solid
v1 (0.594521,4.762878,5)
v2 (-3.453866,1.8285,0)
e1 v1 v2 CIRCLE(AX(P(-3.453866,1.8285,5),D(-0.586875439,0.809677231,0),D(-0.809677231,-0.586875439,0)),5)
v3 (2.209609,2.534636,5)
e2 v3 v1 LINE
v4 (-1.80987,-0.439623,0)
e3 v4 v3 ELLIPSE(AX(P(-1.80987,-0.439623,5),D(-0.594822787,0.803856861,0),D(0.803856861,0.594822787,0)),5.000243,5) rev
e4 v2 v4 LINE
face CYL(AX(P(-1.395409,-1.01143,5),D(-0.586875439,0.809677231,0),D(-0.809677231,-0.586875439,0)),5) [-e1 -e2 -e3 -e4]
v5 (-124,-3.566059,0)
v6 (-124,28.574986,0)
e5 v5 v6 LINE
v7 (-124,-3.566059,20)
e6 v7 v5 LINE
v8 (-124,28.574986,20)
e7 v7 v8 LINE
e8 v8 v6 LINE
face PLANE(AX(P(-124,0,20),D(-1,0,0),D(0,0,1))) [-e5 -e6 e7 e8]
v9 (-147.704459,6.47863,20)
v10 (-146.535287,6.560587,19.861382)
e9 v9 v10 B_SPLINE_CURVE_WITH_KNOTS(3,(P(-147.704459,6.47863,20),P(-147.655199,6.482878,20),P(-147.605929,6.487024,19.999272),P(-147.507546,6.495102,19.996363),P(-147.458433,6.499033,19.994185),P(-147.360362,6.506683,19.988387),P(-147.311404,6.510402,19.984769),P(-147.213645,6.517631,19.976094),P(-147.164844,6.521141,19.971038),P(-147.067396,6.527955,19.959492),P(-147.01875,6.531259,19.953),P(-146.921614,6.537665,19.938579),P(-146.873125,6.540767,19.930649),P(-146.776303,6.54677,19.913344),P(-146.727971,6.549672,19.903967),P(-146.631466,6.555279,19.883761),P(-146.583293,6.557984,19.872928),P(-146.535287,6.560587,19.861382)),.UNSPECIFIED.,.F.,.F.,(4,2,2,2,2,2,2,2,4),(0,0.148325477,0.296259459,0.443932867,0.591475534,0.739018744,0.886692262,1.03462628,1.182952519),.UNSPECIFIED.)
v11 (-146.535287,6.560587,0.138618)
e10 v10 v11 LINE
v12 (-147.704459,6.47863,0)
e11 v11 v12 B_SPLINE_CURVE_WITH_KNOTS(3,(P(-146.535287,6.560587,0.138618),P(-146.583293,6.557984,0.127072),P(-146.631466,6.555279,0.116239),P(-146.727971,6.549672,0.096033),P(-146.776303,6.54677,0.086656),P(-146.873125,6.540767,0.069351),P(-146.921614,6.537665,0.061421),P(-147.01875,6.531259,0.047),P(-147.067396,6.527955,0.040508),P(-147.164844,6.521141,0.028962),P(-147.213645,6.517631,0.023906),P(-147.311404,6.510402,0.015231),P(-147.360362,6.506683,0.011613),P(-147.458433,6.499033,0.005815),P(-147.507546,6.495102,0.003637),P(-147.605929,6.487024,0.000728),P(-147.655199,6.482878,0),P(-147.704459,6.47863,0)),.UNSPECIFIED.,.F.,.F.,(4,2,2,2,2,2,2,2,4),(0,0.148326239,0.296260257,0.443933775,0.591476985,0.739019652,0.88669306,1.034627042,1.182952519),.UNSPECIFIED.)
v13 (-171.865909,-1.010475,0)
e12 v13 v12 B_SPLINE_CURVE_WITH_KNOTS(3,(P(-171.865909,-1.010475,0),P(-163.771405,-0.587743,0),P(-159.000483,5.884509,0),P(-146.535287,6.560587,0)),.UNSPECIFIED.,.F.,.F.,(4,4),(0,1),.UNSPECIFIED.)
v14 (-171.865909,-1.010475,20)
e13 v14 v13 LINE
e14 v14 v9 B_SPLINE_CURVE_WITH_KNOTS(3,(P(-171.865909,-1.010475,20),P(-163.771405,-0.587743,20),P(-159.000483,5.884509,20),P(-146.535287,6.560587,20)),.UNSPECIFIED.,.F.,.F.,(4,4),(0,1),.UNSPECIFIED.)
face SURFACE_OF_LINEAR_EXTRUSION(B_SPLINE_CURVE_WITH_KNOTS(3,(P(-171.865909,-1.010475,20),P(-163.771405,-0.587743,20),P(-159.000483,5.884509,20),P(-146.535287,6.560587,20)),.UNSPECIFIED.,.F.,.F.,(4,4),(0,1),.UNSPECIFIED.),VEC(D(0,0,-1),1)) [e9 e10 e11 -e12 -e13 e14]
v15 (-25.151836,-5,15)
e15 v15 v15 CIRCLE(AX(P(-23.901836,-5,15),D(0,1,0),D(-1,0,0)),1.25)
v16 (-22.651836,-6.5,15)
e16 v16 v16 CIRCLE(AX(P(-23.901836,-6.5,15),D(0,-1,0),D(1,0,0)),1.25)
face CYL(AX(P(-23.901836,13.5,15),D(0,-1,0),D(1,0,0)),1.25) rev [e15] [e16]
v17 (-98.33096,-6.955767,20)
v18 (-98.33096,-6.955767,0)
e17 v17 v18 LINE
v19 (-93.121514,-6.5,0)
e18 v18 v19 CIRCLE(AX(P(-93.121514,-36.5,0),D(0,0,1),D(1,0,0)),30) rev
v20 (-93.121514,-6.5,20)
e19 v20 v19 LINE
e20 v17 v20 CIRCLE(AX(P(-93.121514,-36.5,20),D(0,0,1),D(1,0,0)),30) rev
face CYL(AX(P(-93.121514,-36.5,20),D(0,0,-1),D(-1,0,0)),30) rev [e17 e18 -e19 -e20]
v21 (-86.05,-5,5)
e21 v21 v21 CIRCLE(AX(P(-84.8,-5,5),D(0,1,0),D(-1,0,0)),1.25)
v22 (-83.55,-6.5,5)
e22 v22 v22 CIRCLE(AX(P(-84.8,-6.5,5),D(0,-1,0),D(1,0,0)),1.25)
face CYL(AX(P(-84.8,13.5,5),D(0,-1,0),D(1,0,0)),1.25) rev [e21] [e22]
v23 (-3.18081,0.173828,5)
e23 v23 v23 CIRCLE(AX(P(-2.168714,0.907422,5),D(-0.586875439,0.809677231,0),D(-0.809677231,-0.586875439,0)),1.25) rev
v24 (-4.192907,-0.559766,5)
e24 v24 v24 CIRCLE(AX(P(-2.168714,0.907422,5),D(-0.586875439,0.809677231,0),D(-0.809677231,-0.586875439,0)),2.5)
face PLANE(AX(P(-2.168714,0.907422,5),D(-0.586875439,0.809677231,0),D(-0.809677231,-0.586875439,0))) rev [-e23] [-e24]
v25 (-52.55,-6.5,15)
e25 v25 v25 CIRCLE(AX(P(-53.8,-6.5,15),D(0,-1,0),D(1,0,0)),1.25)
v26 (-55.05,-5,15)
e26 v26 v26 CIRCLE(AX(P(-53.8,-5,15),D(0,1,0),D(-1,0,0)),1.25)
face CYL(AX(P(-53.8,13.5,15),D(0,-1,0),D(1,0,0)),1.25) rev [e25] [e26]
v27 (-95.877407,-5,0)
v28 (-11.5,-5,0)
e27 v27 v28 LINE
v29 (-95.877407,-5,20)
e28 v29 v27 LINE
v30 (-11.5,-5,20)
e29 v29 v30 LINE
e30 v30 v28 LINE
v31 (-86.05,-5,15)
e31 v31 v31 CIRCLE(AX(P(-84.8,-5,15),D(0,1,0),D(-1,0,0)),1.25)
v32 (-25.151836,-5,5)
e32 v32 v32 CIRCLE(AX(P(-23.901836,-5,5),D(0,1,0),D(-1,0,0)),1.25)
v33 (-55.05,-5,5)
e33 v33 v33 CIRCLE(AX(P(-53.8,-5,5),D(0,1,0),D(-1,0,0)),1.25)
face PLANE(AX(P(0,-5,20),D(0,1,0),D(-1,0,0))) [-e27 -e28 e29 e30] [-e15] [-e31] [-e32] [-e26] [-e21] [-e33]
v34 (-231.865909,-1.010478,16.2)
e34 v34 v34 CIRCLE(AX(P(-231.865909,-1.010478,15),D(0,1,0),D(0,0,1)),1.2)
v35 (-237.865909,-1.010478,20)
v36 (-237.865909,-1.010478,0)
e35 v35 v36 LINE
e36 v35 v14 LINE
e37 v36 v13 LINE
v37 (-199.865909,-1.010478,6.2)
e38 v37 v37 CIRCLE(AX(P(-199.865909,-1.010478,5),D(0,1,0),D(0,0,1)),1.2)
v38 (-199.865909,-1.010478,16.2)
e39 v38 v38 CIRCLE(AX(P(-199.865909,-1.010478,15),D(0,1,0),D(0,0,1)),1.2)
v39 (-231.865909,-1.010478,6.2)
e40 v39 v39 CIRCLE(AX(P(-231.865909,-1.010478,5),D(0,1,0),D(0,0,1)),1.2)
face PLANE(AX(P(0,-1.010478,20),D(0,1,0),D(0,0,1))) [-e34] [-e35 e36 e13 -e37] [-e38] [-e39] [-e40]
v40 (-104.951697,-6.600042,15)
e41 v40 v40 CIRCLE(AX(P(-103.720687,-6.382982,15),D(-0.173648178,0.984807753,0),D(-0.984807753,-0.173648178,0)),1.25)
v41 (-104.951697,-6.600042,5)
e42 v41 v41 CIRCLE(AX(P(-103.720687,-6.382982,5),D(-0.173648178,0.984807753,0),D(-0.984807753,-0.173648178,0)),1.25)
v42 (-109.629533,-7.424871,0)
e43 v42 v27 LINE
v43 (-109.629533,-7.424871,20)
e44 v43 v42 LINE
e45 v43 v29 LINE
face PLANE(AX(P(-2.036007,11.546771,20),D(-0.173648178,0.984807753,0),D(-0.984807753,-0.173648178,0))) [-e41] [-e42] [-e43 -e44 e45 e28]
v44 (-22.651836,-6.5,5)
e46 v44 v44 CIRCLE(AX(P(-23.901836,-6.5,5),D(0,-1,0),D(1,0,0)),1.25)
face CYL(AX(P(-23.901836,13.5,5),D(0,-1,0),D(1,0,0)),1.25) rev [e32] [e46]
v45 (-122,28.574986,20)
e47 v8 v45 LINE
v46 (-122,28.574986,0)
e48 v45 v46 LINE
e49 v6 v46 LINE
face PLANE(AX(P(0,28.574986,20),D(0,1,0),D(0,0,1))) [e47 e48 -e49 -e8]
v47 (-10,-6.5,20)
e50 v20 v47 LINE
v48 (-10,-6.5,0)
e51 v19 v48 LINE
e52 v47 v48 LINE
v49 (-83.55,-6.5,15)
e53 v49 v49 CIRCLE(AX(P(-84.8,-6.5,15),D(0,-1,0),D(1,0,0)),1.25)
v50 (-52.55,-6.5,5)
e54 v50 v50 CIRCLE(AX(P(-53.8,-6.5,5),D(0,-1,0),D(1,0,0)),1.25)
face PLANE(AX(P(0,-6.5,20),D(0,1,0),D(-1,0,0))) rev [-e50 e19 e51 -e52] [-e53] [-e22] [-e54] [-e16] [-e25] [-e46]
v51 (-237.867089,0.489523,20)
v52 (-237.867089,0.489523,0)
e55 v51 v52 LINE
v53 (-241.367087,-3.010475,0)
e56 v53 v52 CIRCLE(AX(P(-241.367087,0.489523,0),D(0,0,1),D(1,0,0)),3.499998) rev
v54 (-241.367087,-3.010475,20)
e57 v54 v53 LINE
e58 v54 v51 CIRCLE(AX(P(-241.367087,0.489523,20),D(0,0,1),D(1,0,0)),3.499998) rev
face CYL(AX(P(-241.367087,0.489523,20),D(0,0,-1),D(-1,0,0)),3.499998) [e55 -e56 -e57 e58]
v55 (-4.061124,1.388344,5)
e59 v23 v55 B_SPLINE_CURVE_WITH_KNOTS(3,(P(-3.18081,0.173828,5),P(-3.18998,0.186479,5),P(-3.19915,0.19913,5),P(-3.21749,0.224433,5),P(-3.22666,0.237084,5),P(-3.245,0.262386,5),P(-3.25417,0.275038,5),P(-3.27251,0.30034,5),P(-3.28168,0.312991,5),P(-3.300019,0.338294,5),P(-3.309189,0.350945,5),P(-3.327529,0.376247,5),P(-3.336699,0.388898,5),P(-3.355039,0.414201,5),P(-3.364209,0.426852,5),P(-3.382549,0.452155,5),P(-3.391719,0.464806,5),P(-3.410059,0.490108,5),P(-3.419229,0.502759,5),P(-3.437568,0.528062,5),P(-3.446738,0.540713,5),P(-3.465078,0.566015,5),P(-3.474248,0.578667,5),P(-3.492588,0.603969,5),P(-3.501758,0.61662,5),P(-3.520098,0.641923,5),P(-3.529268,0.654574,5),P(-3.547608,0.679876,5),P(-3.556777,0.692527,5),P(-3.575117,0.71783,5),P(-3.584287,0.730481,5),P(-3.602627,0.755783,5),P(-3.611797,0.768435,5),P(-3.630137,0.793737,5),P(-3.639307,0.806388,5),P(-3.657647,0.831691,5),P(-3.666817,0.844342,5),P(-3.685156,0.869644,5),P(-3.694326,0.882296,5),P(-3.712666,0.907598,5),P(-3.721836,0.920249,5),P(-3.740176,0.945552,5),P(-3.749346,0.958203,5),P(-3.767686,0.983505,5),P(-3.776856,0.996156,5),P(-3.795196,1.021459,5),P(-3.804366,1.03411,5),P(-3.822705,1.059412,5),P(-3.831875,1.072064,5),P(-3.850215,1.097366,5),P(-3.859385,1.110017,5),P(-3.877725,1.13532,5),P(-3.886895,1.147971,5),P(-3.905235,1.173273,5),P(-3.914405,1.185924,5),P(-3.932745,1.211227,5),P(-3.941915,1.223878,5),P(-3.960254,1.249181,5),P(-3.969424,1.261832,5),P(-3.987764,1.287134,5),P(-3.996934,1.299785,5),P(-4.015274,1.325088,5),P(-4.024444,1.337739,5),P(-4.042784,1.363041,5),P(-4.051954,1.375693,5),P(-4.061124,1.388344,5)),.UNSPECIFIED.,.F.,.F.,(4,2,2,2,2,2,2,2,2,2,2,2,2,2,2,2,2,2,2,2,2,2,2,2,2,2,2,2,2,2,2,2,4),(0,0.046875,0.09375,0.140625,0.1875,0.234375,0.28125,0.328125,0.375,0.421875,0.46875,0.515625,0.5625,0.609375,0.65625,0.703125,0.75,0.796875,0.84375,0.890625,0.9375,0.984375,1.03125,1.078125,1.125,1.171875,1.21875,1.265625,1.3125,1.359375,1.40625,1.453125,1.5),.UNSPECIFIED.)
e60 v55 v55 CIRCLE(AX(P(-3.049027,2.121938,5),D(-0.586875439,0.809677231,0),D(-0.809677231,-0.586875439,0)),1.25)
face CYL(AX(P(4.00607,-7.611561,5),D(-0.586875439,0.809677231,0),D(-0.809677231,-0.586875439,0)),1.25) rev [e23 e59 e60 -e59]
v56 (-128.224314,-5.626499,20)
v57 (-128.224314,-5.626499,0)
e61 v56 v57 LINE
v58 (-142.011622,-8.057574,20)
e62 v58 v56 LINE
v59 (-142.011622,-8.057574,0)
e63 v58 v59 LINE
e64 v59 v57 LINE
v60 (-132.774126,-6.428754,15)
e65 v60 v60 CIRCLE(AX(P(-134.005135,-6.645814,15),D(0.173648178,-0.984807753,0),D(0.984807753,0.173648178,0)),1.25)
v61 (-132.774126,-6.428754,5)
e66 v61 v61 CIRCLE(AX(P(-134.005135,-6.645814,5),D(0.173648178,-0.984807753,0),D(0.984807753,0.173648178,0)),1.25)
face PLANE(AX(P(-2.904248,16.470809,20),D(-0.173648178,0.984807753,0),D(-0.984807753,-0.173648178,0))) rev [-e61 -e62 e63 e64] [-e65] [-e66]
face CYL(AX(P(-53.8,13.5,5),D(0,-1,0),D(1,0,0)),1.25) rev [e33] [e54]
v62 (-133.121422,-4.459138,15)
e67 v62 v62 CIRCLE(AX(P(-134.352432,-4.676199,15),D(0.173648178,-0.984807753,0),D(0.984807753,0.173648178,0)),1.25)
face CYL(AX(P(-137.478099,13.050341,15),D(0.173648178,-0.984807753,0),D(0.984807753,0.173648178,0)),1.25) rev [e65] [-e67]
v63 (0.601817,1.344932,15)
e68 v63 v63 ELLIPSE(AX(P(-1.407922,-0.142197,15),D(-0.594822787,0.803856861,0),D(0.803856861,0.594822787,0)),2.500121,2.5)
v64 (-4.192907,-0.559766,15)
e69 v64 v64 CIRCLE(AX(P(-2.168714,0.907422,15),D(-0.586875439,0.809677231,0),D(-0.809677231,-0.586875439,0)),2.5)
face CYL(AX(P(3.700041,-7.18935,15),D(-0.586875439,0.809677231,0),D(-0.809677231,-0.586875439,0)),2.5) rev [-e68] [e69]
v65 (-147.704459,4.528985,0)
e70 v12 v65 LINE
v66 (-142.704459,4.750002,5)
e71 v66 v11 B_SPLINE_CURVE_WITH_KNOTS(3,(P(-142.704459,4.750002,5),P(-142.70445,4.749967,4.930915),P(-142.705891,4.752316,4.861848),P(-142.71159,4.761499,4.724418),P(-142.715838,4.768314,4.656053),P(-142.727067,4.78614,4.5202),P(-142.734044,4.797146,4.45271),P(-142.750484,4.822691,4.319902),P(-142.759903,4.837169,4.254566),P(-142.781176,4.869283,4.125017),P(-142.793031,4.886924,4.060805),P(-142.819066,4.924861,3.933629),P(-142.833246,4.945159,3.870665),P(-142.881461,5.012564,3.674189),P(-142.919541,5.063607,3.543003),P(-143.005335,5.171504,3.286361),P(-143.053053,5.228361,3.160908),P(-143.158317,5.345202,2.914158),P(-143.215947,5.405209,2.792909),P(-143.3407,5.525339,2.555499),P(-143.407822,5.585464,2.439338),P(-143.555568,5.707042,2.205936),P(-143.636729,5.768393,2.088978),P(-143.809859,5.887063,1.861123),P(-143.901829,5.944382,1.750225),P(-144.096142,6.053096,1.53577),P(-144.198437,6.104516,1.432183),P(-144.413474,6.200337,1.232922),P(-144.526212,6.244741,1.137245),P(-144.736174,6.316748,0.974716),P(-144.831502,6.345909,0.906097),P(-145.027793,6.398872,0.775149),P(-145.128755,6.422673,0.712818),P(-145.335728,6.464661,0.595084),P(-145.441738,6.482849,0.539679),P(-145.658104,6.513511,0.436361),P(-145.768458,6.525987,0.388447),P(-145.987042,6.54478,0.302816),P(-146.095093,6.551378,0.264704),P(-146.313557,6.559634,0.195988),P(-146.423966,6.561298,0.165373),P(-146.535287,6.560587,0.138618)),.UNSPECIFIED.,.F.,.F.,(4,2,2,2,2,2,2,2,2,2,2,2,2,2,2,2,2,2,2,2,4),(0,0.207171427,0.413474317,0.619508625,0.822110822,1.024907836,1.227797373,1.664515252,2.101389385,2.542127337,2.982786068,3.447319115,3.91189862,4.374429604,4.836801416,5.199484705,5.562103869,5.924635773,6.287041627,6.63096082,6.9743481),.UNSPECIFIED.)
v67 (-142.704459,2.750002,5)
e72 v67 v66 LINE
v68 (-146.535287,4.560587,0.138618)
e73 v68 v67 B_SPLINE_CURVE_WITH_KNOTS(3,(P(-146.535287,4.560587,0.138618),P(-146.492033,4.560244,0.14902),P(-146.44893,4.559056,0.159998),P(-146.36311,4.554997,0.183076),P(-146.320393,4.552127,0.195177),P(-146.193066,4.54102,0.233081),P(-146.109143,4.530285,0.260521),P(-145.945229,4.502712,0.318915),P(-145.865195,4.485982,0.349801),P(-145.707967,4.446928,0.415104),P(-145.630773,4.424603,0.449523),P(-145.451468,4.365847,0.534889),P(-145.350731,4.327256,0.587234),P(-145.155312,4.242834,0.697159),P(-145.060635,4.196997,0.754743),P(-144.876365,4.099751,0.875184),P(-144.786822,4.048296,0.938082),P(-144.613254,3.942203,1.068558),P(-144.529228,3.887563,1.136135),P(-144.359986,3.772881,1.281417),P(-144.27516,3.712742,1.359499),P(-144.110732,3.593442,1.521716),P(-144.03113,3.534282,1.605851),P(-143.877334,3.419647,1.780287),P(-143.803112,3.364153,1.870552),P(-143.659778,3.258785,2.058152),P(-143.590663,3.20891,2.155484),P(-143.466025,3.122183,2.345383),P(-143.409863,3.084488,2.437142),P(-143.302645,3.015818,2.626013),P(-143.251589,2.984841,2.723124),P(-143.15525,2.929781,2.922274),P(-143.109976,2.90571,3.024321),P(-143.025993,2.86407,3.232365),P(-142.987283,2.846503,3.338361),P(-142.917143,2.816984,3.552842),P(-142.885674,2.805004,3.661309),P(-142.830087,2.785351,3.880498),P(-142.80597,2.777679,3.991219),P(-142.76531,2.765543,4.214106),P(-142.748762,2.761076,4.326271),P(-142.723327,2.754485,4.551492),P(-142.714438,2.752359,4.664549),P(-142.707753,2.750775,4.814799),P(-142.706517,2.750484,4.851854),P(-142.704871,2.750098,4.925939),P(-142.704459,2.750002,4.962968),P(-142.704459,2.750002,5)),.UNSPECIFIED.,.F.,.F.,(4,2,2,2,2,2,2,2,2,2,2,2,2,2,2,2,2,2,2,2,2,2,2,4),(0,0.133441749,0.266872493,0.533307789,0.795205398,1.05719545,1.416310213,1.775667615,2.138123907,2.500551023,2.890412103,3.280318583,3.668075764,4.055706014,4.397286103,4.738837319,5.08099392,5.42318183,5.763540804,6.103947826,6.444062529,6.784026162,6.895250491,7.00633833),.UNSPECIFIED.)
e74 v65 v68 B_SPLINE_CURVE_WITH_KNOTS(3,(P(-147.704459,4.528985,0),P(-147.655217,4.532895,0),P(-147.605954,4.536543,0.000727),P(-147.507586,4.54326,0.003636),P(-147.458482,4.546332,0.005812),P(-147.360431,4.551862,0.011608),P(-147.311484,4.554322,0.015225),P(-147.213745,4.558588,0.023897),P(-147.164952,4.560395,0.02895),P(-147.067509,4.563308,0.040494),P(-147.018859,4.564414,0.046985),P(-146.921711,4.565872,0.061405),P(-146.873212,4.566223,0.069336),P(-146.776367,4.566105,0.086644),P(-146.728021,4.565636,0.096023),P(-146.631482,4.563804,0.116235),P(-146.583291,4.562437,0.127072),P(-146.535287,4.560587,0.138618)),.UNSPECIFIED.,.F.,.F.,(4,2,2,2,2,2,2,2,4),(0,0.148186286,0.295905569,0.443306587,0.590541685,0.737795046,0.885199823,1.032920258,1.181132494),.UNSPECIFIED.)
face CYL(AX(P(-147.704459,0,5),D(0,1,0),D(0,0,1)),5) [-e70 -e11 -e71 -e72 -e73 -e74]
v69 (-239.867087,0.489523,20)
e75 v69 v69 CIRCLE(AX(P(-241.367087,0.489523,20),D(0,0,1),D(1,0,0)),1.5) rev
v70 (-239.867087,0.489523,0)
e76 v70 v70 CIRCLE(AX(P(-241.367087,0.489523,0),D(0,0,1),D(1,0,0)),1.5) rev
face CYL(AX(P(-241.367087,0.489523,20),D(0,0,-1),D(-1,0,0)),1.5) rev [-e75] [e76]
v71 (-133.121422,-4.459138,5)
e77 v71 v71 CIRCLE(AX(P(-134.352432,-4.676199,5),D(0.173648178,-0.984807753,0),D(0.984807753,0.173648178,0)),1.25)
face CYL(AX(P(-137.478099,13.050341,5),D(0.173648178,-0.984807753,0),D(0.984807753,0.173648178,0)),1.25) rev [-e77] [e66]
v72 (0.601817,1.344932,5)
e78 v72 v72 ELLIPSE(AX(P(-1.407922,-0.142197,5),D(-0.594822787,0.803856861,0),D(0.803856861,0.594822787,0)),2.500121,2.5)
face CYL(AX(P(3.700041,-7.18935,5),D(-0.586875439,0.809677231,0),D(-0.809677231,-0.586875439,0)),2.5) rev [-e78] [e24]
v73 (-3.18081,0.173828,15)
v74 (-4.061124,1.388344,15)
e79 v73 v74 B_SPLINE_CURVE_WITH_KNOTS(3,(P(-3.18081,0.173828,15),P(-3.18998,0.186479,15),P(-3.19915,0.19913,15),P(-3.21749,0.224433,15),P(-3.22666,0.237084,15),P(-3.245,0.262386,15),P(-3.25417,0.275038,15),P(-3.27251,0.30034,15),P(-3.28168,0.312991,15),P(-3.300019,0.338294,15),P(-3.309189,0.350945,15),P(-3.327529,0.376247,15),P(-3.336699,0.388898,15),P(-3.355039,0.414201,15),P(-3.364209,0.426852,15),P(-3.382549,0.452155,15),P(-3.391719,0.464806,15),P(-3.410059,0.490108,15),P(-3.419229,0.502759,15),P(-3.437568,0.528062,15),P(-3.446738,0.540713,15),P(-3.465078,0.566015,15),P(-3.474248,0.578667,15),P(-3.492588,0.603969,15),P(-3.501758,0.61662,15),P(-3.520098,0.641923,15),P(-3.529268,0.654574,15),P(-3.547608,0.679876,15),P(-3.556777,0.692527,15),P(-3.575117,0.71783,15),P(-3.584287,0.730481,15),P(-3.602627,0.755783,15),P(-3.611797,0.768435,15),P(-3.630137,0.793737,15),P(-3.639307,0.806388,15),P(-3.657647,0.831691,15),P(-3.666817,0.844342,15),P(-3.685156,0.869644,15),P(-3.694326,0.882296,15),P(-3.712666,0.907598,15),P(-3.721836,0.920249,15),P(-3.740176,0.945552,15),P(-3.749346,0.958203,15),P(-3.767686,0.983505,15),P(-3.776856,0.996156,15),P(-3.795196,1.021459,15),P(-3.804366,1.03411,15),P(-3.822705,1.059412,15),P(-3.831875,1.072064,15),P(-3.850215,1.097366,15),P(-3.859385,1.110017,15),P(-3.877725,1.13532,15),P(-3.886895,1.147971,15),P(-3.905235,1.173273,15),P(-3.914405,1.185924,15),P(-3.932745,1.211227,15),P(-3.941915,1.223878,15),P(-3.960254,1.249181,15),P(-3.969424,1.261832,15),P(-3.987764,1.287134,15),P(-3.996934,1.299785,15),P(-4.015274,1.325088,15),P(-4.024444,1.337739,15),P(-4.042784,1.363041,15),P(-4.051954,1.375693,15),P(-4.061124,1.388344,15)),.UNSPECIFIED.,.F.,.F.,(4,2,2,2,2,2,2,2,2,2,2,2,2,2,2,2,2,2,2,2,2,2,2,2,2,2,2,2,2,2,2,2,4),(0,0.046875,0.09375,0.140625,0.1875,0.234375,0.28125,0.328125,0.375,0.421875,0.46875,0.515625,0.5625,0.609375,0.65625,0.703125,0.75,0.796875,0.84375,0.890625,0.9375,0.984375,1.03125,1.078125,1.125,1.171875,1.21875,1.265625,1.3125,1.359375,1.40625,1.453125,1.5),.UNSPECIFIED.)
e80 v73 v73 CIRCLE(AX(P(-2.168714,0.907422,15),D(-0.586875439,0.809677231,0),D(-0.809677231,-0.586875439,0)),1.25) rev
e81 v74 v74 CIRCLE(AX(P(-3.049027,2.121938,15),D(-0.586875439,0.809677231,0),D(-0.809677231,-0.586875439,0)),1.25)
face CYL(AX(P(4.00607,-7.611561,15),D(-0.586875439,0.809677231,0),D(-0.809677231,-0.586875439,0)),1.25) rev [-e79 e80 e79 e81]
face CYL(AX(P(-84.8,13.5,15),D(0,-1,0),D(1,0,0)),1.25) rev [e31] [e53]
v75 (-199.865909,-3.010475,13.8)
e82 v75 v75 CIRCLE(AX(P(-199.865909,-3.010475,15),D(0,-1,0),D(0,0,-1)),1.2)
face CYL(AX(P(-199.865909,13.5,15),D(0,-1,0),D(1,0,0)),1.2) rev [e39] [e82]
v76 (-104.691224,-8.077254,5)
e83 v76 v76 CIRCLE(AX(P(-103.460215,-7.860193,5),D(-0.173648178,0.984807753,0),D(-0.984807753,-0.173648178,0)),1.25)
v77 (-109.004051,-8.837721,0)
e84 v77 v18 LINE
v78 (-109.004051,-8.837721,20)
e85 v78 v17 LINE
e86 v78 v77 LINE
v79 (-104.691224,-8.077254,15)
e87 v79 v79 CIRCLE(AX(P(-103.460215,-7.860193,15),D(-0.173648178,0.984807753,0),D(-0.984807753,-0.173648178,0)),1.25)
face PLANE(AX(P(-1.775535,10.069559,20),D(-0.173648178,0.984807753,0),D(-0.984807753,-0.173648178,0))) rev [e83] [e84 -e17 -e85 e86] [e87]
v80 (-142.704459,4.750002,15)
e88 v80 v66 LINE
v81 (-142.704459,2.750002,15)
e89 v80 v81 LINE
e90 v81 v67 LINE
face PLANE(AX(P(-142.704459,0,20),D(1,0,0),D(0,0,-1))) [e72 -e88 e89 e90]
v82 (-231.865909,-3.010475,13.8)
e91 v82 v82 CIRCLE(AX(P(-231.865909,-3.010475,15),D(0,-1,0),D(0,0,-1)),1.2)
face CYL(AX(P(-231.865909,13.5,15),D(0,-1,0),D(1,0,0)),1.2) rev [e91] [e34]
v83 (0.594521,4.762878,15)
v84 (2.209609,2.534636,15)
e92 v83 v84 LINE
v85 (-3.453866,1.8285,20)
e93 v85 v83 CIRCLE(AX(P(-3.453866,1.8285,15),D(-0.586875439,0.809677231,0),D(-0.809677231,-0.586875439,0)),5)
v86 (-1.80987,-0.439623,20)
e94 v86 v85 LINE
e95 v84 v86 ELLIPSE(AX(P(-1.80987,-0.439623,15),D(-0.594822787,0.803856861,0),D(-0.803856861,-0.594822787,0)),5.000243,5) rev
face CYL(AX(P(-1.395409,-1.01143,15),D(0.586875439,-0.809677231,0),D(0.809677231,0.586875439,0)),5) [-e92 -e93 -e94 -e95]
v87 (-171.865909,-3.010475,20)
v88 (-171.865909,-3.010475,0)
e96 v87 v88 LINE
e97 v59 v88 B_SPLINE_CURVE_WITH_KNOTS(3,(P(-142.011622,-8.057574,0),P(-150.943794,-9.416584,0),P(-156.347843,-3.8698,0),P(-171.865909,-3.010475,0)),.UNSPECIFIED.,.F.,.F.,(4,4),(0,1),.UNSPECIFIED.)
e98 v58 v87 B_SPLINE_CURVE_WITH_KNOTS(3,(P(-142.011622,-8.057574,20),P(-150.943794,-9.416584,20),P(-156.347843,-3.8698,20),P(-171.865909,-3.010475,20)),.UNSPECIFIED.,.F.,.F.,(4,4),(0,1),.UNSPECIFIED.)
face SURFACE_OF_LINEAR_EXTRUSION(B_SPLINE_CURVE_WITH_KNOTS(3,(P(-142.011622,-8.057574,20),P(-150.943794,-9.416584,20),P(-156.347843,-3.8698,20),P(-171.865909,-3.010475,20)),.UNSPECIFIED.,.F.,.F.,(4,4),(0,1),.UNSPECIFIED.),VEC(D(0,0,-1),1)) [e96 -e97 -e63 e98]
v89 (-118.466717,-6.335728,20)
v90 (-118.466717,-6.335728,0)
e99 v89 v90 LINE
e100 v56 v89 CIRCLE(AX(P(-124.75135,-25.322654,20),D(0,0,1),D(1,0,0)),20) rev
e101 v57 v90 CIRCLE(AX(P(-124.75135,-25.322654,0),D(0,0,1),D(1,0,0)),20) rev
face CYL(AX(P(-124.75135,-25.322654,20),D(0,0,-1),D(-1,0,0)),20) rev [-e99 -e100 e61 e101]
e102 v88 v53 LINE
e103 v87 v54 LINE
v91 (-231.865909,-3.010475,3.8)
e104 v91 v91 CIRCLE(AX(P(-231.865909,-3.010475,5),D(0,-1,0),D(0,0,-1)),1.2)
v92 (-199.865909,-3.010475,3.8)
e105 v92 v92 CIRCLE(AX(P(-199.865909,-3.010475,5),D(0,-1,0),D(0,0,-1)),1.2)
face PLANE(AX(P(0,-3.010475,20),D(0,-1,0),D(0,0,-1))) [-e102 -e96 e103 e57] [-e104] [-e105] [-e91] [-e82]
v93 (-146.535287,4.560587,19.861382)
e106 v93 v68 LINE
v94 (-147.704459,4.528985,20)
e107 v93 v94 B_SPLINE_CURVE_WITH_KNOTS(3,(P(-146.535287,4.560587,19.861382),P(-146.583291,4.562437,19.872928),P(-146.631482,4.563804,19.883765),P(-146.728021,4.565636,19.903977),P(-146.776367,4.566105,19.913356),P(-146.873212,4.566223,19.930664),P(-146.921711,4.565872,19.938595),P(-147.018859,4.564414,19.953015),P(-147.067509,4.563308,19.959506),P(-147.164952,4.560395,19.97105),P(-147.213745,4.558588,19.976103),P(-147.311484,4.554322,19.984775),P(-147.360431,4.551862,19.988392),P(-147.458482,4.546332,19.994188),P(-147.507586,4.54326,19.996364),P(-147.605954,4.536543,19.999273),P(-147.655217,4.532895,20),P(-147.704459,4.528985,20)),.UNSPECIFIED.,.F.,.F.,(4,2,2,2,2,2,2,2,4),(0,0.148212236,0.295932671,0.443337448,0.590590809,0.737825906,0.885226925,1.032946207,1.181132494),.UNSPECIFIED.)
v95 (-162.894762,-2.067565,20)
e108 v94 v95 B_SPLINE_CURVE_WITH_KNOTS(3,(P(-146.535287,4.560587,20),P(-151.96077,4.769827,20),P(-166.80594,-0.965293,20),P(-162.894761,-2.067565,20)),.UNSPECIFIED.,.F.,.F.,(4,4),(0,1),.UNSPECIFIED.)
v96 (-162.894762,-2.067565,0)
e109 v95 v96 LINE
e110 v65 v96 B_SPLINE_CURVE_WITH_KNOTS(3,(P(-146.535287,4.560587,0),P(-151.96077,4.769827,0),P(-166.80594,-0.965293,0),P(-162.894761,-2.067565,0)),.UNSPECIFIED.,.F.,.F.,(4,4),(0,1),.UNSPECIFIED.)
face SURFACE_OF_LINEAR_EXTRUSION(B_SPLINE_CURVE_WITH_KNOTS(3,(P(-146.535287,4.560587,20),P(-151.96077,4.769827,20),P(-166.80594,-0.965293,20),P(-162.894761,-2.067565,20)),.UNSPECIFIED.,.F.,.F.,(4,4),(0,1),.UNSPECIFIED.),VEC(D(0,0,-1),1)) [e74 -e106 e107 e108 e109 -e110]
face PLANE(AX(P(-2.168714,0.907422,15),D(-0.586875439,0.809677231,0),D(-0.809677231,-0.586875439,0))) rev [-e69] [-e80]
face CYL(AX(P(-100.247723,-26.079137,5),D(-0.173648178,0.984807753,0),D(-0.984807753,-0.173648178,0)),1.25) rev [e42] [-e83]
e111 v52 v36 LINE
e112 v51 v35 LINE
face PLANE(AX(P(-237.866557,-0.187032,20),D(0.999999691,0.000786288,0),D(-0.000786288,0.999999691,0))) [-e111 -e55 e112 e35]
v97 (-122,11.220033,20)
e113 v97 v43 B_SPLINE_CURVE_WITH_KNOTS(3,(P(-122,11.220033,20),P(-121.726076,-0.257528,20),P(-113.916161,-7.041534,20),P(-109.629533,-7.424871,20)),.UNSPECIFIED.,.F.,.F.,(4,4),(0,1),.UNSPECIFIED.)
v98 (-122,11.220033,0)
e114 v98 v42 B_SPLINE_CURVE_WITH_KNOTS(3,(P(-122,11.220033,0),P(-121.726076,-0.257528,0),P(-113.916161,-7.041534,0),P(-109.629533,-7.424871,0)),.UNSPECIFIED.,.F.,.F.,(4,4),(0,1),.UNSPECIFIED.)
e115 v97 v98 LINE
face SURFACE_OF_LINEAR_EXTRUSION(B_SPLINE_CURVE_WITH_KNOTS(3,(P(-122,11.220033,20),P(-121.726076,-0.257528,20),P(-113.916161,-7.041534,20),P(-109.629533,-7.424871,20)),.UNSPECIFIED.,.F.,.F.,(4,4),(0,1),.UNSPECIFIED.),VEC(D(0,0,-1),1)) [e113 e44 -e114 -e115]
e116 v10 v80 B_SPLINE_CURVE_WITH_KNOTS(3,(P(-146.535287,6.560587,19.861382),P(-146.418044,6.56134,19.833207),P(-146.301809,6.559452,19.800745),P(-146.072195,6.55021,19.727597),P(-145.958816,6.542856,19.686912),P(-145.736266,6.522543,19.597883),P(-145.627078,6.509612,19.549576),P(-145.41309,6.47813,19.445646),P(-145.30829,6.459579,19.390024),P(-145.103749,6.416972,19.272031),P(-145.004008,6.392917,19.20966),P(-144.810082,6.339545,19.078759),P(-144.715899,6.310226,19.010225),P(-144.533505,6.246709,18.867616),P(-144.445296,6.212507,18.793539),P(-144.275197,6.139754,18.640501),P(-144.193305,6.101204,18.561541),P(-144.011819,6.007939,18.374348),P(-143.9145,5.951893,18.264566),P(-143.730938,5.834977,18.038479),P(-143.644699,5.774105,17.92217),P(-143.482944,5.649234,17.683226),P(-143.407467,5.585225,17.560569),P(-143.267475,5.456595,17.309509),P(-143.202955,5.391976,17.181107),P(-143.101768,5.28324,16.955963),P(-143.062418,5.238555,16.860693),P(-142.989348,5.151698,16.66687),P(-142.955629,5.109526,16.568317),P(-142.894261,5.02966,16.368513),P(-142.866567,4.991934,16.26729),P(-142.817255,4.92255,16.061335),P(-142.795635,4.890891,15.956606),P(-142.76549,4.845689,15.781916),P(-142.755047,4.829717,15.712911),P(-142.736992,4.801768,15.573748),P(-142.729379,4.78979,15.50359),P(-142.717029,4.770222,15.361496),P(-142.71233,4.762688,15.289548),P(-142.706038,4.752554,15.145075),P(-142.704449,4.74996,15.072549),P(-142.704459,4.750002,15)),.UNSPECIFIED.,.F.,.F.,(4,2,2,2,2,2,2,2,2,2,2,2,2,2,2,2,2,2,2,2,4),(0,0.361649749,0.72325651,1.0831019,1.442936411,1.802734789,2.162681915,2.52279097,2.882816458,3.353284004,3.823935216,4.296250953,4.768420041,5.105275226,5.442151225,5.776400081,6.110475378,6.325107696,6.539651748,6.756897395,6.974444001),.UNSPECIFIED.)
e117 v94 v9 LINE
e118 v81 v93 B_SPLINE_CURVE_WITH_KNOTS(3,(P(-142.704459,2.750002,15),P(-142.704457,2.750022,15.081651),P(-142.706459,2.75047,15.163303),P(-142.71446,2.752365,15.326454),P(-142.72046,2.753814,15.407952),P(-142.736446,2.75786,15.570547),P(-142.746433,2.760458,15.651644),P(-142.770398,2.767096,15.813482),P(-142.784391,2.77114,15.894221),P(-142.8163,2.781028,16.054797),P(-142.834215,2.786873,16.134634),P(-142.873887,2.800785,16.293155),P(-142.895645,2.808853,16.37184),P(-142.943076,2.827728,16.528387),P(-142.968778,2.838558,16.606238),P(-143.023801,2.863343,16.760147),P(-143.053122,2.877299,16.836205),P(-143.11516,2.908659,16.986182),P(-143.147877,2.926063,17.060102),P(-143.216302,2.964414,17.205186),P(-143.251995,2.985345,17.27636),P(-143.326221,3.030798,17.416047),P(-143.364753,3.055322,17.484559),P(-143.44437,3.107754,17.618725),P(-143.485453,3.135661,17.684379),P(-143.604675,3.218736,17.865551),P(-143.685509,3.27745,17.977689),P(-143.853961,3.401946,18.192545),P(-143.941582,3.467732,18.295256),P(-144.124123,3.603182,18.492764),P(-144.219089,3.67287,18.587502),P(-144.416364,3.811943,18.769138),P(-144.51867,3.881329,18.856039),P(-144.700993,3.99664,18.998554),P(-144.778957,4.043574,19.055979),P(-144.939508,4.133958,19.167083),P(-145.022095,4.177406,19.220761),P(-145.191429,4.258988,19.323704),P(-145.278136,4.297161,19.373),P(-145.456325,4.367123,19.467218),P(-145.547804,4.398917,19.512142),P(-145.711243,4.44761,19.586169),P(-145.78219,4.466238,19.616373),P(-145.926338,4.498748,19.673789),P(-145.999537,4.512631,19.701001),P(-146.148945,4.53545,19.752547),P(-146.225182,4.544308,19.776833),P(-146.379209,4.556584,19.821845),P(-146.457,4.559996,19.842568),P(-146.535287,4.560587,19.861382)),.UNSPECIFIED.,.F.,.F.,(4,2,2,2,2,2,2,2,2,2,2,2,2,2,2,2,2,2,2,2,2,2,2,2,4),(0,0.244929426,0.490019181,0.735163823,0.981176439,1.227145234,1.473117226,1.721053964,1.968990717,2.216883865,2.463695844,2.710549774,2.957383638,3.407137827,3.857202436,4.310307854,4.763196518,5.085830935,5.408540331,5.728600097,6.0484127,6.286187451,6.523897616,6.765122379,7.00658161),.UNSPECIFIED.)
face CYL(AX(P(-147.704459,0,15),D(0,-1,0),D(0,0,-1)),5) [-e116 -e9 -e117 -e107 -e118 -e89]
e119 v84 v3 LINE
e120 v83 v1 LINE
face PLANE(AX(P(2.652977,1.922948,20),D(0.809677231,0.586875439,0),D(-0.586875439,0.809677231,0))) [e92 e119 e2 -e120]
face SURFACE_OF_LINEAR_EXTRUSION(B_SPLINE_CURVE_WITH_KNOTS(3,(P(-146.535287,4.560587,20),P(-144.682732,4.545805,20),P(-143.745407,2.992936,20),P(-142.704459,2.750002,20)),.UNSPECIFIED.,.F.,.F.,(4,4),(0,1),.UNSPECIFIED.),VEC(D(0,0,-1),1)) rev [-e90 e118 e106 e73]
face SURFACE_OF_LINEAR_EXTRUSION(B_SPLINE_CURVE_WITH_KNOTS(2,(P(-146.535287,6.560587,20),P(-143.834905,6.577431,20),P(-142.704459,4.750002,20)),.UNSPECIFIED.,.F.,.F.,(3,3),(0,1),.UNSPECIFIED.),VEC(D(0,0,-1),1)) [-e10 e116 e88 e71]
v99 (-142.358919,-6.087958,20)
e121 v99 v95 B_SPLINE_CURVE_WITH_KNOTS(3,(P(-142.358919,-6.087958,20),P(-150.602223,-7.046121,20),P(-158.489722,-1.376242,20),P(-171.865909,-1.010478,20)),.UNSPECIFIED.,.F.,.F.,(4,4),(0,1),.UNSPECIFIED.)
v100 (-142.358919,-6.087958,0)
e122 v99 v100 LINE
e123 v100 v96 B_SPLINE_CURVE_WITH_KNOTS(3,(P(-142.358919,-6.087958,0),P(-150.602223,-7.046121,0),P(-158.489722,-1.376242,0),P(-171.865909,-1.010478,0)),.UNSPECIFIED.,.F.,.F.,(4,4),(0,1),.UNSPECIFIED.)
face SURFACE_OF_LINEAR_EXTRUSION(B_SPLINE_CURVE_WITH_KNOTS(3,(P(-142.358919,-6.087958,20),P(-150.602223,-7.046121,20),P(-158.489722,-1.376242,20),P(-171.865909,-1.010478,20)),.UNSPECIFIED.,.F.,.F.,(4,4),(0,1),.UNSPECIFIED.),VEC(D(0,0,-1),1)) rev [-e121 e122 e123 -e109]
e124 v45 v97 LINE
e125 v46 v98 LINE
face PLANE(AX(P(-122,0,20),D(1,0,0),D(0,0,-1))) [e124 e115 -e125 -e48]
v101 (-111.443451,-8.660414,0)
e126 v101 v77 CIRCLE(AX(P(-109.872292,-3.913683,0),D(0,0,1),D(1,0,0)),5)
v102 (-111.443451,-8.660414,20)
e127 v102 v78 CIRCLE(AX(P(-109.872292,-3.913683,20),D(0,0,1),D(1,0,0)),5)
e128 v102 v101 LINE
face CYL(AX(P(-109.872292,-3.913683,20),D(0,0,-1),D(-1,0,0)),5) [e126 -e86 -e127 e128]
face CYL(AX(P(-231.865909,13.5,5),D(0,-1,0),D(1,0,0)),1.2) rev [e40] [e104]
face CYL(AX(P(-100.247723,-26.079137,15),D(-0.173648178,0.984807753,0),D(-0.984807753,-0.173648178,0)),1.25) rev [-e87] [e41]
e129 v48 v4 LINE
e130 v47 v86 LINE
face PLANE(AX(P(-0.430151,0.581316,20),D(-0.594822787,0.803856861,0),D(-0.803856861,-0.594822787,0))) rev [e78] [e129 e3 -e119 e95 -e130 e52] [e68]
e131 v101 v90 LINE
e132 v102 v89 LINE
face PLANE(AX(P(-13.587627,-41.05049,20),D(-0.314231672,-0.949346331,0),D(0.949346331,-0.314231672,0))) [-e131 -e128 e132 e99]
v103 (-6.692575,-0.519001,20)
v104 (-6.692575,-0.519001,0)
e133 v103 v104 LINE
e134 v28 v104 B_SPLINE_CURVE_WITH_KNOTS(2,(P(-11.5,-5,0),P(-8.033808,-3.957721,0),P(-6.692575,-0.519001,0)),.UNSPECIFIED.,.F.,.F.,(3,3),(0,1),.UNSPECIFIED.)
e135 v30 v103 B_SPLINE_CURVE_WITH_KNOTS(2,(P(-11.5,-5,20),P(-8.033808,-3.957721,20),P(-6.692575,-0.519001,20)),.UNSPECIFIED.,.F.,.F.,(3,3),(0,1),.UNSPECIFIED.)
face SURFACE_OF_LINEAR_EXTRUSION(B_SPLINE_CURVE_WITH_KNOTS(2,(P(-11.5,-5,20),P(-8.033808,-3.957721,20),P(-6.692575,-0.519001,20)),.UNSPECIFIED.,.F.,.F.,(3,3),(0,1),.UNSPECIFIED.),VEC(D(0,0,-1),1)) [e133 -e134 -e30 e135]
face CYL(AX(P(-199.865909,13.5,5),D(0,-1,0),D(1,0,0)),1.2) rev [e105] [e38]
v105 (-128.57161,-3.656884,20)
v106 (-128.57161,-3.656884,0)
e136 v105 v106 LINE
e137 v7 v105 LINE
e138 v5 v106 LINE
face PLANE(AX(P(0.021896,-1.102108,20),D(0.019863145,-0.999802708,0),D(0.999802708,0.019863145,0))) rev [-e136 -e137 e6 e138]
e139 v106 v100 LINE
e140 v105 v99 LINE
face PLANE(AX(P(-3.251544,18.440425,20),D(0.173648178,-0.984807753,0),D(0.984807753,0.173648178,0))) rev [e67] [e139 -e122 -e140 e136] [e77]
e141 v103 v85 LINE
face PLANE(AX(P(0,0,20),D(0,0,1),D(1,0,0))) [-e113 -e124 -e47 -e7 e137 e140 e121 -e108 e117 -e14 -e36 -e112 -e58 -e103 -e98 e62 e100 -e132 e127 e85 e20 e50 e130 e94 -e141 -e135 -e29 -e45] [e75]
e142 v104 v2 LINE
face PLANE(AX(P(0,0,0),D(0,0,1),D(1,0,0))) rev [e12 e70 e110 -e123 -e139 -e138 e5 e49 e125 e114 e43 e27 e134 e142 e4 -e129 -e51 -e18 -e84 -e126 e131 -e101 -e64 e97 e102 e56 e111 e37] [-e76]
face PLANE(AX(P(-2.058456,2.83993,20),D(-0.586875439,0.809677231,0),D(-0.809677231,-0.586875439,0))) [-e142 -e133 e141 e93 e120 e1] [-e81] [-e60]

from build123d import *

# Parameters (mm, degrees)
EXTRUDE_1_OUTLINE_R = 1.5
EXTRUDE_1_DEPTH     = 20
SKETCH_2_R          = 1.25
SKETCH_2_R_2        = 1.2
CUT_EXTRUDE_1_DEPTH = 20
SKETCH_3_R          = 1.25
CUT_EXTRUDE_2_DEPTH = 20
SKETCH_4_R          = 1.25
CUT_EXTRUDE_3_DEPTH = 20
SKETCH_9_R          = 1.25
CUT_EXTRUDE_5_DEPTH = 245.986373256
CUT_EXTRUDE_START   = -1.5
SKETCH_10_R         = 2.5
CUT_EXTRUDE_6_DEPTH = 10
FILLET_1_R          = 5
FILLET_2_R          = 5


# Read off the part's stored shape, not the designer's step: Бобышка-Вытянуть1
with BuildPart() as part:
    # Бобышка-Вытянуть1 outline → Бобышка-Вытянуть1 (new body)
    with BuildSketch(Plane(origin=(0, 0, 0), x_dir=(-1, 0, 0), z_dir=(0, 0, 1))):
        with BuildLine():
            add(Edge.make_bspline(
                [(142.011622395, 8.05757382), (150.943794363, 9.416584141), (156.347843346, 3.869799571), (171.865909279, 3.010474878)],
                knots=[0, 0, 0, 0, 1, 1, 1, 1], degree=3))
            Line((142.011622395, 8.05757382), (128.224313853, 5.626499332))
            ThreePointArc((128.224313853, 5.626499332), (123.301480263, 5.375276698), (118.466716866, 6.335727769))
            Line((118.466716866, 6.335727769), (111.443450657, 8.660414355))
            ThreePointArc((111.443450657, 8.660414355), (110.234759808, 8.900527123), (109.004051411, 8.837721464))
            Line((109.004051411, 8.837721464), (98.330959593, 6.955767409))
            ThreePointArc((98.330959593, 6.955767409), (95.736186546, 6.614159057), (93.121514264, 6.5))
            Line((93.121514264, 6.5), (10, 6.5))
            Line((10, 6.5), (-2.209609181, -2.534635535))
            Line((-2.209609181, -2.534635535), (-0.594520503, -4.762877579))
            Line((-0.594520503, -4.762877579), (6.692574577, 0.519001376))
            add(Edge.make_bspline(
                [(11.5, 5), (8.033807528, 3.95772064), (6.692574577, 0.519001376)],
                knots=[0, 0, 0, 1, 1, 1], degree=2))
            Line((11.5, 5), (95.877407164, 5))
            Line((95.877407164, 5), (109.629533412, 7.424870899))
            add(Edge.make_bspline(
                [(122, -11.220033081), (121.726076148, 0.257528082), (113.91616074, 7.041533795), (109.629533412, 7.424870899)],
                knots=[0, 0, 0, 0, 1, 1, 1, 1], degree=3))
            Line((122, -11.220033081), (122, -28.57498627))
            Line((122, -28.57498627), (123.999999999, -28.57498627))
            Line((123.999999999, -28.57498627), (123.999999999, 3.566059351))
            Line((123.999999999, 3.566059351), (128.571610209, 3.656883826))
            Line((128.571610209, 3.656883826), (142.358918751, 6.087958314))
            add(Edge.make_bspline(
                [(142.358918751, 6.087958314), (148.572133876, 6.8101534), (154.583213425, 3.766911307), (162.894761518, 2.067564733)],
                knots=[0, 0, 0, 0, 0.753728725, 0.753728725, 0.753728725, 0.753728725], degree=3))
            add(Edge.make_bspline(
                [(146.535286779, -4.560587457), (151.960770454, -4.769826895), (166.805940444, 0.965293), (162.894761518, 2.067564733)],
                knots=[0, 0, 0, 0, 1, 1, 1, 1], degree=3))
            add(Edge.make_bspline(
                [(146.535286779, -4.560587457), (144.68273182, -4.545804635), (143.745407166, -2.992935642), (142.704459303, -2.750002164)],
                knots=[0, 0, 0, 0, 1, 1, 1, 1], degree=3))
            Line((142.704459303, -2.750002164), (142.704459303, -4.750002164))
            add(Edge.make_bspline(
                [(146.535286779, -6.560587457), (143.834904881, -6.577431366), (142.704459303, -4.750002164)],
                knots=[0, 0, 0, 1, 1, 1], degree=2))
            add(Edge.make_bspline(
                [(171.865909279, 1.010474878), (163.771404707, 0.58774305), (159.000482555, -5.884509042), (146.535286779, -6.560587457)],
                knots=[0, 0, 0, 0, 1, 1, 1, 1], degree=3))
            Line((171.865909279, 1.010474878), (237.865909279, 1.010478432))
            Line((237.865909279, 1.010478432), (237.867088713, -0.489522958))
            ThreePointArc((237.867088713, -0.489522958), (243.841958753, -2.964395162), (241.367086549, 3.010474878))
            Line((241.367086549, 3.010474878), (171.865909279, 3.010474878))
        make_face()
        with Locations((241.367086549, -0.489522958)):
            Circle(EXTRUDE_1_OUTLINE_R, mode=Mode.SUBTRACT)
    extrude(amount=EXTRUDE_1_DEPTH)

    # Эскиз2 → Вырез-Вытянуть1 (cut)
    with BuildSketch(Plane.XZ.offset(6.5)):
        with Locations((-84.8, 15)):
            Circle(SKETCH_2_R)
        with Locations((-84.8, 5)):
            Circle(SKETCH_2_R)
        with Locations((-53.8, 15)):
            Circle(SKETCH_2_R)
        with Locations(Location((-231.865909279, 15, 0), (0, 0, 90))):
            Circle(SKETCH_2_R_2)
        with Locations(Location((-231.865909279, 5, 0), (0, 0, 90))):
            Circle(SKETCH_2_R_2)
        with Locations(Location((-199.865909279, 5, 0), (0, 0, 90))):
            Circle(SKETCH_2_R_2)
        with Locations(Location((-199.865909279, 15, 0), (0, 0, 90))):
            Circle(SKETCH_2_R_2)
        with Locations((-23.901835852, 15)):
            Circle(SKETCH_2_R)
        with Locations((-23.901835852, 5)):
            Circle(SKETCH_2_R)
        with Locations((-53.8, 5)):
            Circle(SKETCH_2_R)
    extrude(amount=-CUT_EXTRUDE_1_DEPTH, mode=Mode.SUBTRACT)

    # Эскиз3 → Вырез-Вытянуть2 (cut)
    with BuildSketch(Plane(origin=(-229.245460819, -28.516386222, 0), x_dir=(0.9848077530144649, 0.1736481776541319, 0), z_dir=(-0.17364817765413187, 0.9848077530144648, 0))):
        with Locations(Location((127.461195894, -15, 0), (0, 0, 180))):
            Circle(SKETCH_3_R)
        with Locations(Location((127.461195894, -5, 0), (0, 0, 180))):
            Circle(SKETCH_3_R)
    extrude(amount=-CUT_EXTRUDE_2_DEPTH, mode=Mode.SUBTRACT)

    # Эскиз4 → Вырез-Вытянуть3 (cut)
    with BuildSketch(Plane(origin=(-2.904248106, 16.470809483, 0), x_dir=(0.9848077530122088, 0.17364817766692647, 0), z_dir=(0.17364817766692645, -0.9848077530122087, 0))):
        with Locations((-133.123329763, 15)):
            Circle(SKETCH_4_R)
        with Locations((-133.123329763, 5)):
            Circle(SKETCH_4_R)
    extrude(amount=-CUT_EXTRUDE_3_DEPTH, mode=Mode.SUBTRACT)

    # Эскиз9 → Вырез-Вытянуть5 (cut, through all)
    with BuildSketch(Plane(origin=(-2.058456242, 2.839929973, 0), x_dir=(0.8096772311060745, 0.5868754394489519, 0), z_dir=(-0.5868754394489519, 0.8096772311060745, 0))):
        with Locations(Location((-1.223414413, -5, 0), (0, 0, 180))):
            Circle(SKETCH_9_R)
        with Locations(Location((-1.223414413, -15, 0), (0, 0, 180))):
            Circle(SKETCH_9_R)
    extrude(amount=-CUT_EXTRUDE_5_DEPTH, mode=Mode.SUBTRACT)

    # Эскиз10 → Вырез-Вытянуть6 (cut)
    with BuildSketch(Plane(origin=(-2.058456242, 2.839929973, 0), x_dir=(0.8096772311060745, 0.5868754394489519, 0), z_dir=(-0.5868754394489519, 0.8096772311060745, 0)).offset(CUT_EXTRUDE_START)):
        with Locations(Location((-1.223414413, -5, 0), (0, 0, 180))):
            Circle(SKETCH_10_R)
        with Locations(Location((-1.223414413, -15, 0), (0, 0, 180))):
            Circle(SKETCH_10_R)
    extrude(amount=-CUT_EXTRUDE_6_DEPTH, mode=Mode.SUBTRACT)

    # Скругление1
    fillet_1_edges = [part.edges().sort_by_distance(p)[0] for p in [
        (-142.704459303, 3.750002164, 0),
        (-142.704459303, 3.750002164, 20),
    ]]
    fillet(fillet_1_edges, radius=FILLET_1_R)

    # Скругление2
    fillet_2_edges = [part.edges().sort_by_distance(p)[0] for p in [
        (1.402064842, 3.648756557, 0),
        (1.402064842, 3.648756557, 20),
    ]]
    fillet(fillet_2_edges, radius=FILLET_2_R)


solid = part.part
